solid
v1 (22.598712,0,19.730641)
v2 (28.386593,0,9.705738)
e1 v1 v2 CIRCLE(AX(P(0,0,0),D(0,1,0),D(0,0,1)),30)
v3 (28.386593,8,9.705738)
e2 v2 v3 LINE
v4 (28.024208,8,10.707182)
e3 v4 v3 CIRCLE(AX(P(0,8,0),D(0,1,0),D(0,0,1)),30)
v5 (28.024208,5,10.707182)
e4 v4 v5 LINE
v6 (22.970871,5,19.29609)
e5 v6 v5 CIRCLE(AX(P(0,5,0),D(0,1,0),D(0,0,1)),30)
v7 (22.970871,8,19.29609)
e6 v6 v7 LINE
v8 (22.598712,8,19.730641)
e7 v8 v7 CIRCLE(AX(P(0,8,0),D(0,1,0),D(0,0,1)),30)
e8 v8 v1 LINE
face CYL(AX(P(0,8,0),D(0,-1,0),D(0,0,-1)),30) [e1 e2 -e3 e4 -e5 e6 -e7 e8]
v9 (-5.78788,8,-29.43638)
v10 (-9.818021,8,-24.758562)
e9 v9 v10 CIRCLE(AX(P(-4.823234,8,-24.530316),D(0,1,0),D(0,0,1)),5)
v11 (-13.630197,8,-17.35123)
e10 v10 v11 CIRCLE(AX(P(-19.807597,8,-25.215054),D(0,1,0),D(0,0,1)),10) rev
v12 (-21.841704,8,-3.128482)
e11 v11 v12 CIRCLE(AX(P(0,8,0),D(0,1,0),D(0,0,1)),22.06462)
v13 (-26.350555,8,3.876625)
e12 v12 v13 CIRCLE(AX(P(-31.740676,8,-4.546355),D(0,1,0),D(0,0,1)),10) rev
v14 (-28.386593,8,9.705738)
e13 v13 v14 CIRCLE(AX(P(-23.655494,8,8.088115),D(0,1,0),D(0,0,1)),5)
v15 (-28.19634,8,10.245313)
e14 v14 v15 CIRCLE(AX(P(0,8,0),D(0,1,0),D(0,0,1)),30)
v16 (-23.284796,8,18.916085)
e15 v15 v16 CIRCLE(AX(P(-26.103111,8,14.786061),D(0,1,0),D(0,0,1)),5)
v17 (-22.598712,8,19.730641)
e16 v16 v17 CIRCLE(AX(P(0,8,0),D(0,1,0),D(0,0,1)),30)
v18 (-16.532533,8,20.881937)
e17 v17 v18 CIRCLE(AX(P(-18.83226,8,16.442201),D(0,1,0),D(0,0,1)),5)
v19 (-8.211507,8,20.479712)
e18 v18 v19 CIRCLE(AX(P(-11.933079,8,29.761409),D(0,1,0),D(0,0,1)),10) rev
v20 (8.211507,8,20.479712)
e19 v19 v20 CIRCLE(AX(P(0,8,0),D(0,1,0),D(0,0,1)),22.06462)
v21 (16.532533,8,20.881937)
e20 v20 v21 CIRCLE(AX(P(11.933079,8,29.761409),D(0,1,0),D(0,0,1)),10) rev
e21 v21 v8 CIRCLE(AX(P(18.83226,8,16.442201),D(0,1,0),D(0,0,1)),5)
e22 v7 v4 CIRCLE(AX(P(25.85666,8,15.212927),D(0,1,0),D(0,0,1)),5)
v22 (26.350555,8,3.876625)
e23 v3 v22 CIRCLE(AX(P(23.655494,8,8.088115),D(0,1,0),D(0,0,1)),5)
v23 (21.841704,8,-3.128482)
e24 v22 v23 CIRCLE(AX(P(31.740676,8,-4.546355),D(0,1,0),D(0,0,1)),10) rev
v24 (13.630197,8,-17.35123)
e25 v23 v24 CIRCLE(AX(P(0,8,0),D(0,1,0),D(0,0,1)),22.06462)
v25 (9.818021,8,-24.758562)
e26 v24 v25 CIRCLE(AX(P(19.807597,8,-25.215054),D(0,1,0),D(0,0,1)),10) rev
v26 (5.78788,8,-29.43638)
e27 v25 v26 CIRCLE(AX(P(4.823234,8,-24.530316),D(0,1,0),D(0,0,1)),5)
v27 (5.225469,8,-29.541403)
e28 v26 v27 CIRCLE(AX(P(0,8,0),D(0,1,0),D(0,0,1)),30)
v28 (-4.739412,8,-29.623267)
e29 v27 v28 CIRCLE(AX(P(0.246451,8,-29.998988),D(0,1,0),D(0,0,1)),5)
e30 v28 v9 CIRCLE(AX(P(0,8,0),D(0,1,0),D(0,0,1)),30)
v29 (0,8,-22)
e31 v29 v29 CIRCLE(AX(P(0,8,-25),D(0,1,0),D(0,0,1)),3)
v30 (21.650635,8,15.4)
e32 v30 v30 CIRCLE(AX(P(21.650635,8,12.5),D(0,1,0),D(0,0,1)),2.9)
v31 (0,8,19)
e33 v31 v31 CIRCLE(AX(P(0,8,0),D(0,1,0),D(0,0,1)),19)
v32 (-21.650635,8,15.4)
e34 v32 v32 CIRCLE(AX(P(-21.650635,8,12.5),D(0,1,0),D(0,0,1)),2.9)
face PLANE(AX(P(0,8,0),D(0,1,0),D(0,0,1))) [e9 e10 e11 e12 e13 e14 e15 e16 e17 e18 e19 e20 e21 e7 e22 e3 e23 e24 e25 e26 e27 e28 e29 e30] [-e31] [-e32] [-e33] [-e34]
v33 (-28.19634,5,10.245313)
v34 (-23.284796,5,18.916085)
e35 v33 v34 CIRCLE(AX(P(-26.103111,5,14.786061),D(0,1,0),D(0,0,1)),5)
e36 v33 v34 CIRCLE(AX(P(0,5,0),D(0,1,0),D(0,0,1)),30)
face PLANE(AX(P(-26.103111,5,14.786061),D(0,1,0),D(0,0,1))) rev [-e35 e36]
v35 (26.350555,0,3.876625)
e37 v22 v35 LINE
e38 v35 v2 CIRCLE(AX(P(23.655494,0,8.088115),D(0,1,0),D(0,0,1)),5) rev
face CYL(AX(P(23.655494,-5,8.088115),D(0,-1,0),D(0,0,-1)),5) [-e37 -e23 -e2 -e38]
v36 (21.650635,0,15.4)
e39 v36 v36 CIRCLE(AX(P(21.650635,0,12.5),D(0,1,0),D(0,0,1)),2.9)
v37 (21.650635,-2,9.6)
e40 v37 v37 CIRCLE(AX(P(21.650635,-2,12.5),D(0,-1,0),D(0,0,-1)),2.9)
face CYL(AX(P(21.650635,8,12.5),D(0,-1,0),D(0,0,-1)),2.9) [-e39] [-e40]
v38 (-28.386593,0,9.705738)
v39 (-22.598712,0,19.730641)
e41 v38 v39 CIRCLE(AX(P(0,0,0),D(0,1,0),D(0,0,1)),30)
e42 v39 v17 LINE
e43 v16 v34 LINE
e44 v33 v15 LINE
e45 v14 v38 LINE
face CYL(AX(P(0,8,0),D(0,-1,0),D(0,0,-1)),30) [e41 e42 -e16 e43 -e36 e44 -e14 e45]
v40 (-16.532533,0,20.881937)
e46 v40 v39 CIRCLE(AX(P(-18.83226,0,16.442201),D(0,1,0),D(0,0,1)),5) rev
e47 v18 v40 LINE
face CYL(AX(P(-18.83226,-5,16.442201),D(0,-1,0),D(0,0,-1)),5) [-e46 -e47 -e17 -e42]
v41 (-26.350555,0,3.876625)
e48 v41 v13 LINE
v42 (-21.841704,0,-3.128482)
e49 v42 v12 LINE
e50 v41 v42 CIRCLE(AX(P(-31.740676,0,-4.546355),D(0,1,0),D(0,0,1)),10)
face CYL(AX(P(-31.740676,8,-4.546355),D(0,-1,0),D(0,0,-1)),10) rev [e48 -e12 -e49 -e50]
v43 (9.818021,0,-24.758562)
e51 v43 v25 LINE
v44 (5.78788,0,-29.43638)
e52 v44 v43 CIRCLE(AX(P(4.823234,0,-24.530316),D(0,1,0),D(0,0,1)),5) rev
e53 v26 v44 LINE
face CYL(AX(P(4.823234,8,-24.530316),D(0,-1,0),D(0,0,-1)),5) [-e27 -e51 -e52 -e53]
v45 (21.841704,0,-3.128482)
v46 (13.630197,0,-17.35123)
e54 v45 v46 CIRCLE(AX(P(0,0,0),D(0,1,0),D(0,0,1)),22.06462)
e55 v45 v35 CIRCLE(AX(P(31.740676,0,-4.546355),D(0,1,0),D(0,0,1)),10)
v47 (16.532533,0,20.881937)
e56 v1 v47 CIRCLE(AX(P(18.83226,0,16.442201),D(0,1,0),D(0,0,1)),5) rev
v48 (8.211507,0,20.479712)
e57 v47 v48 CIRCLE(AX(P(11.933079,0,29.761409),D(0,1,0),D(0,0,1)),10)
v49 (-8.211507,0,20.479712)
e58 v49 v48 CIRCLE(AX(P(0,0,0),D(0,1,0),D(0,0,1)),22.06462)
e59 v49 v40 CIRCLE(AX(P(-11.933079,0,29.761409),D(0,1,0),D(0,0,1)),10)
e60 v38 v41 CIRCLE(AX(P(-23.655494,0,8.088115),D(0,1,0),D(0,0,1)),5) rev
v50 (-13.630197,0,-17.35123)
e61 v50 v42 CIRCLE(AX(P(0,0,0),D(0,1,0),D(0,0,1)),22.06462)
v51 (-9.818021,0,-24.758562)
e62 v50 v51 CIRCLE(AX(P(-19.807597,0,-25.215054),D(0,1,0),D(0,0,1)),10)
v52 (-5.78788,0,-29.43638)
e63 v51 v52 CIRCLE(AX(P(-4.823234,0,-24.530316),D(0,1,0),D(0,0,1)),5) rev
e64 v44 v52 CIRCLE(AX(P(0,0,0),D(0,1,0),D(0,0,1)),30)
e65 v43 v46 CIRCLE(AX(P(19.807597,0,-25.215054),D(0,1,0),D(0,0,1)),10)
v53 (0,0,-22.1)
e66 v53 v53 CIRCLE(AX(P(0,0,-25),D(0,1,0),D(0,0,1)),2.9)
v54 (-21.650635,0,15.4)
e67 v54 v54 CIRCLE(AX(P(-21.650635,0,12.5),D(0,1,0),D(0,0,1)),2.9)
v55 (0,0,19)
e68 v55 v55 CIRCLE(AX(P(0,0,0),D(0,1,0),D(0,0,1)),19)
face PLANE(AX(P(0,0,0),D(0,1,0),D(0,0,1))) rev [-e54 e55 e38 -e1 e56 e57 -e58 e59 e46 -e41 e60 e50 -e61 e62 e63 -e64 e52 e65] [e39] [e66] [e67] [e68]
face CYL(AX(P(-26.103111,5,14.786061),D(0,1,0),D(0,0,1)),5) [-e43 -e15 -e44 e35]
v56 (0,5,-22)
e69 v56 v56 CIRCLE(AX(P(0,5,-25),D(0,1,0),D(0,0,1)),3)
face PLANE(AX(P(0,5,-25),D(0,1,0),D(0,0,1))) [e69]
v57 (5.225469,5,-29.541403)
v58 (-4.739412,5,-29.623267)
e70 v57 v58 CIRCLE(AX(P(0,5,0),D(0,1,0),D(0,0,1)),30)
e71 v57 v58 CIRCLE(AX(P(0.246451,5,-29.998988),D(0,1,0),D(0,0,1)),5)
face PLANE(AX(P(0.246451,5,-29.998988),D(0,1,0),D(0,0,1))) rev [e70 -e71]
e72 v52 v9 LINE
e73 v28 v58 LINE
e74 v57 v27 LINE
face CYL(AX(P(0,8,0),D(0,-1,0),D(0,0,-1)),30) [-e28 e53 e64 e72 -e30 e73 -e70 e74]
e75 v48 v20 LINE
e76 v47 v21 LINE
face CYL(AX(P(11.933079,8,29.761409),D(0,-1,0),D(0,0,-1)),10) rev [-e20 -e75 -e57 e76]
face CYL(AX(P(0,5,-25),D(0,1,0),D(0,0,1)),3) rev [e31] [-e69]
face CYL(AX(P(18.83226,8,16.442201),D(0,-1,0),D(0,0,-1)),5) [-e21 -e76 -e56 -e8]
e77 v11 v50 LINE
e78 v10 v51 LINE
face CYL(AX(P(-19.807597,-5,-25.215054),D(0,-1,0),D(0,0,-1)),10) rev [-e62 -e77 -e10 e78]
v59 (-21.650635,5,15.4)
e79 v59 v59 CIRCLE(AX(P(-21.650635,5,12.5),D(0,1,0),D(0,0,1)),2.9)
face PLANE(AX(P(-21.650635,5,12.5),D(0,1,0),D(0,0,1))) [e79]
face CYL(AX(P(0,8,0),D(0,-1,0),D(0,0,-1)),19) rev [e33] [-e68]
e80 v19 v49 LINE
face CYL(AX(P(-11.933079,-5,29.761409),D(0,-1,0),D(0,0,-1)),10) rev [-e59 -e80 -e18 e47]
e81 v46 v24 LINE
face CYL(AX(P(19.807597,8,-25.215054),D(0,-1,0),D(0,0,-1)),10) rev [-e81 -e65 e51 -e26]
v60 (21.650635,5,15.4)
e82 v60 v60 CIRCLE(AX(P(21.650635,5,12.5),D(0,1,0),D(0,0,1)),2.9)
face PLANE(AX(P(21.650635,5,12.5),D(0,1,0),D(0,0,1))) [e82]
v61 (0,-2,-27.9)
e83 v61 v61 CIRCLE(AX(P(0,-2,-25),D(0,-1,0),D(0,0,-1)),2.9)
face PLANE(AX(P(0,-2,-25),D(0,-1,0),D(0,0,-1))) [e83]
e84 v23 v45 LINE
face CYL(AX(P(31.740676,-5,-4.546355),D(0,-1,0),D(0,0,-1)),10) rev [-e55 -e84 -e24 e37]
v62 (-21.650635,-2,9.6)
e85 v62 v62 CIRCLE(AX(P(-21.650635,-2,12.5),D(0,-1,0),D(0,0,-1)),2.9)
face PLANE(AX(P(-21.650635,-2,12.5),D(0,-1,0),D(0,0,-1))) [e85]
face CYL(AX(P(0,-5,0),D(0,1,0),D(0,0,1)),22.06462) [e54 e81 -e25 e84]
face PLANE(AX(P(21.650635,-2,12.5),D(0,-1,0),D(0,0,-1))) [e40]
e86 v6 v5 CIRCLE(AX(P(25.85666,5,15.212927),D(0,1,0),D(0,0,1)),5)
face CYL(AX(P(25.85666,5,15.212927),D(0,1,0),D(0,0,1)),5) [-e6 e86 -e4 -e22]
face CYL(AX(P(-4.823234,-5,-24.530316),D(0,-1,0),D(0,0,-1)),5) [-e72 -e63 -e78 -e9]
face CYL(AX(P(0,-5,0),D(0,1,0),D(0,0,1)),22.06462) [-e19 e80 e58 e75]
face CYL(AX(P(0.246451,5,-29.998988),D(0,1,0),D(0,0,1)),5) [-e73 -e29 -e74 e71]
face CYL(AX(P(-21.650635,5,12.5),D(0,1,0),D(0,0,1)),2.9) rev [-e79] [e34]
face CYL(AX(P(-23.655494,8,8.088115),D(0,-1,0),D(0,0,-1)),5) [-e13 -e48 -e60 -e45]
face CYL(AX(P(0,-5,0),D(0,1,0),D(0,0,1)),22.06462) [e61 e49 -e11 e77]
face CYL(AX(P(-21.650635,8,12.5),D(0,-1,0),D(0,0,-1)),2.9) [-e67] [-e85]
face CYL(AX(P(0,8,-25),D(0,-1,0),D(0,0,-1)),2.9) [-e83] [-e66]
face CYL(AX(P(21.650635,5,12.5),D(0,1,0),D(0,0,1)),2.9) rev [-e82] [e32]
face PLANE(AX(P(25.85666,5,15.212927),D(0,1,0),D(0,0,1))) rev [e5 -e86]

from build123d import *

# Parameters (mm, degrees)
SKETCH1_R                = 19
BOSS_EXTRUDE1_DEPTH      = 3.5
SKETCH2_R                = 30
SKETCH2_R_2              = 19
SKETCH2_R_3              = 2.8
BOSS_EXTRUDE2_DEPTH      = 8
BOSS_EXTRUDE3_DEPTH      = 2
BOSS_EXTRUDE3_DEPTH_BACK = 8
SKETCH4_R                = 2.9
SKETCH5_R                = 5
BOSS_EXTRUDE4_DEPTH      = 3
CUT_EXTRUDE1_START       = -10
SKETCH3_R                = 19
CUT_EXTRUDE1_DEPTH       = 10
SKETCH6_R                = 3
SKETCH6_R_2              = 2.9
CUT_EXTRUDE2_DEPTH       = 3
CUT_EXTRUDE3_START       = -13
CUT_EXTRUDE3_DEPTH       = 13
FILLET1_R                = 10
FILLET2_R                = 5


with BuildPart() as part:
    # Sketch1 → Boss-Extrude1 (new body)
    with BuildSketch(Plane(origin=(0, 0, 0), x_dir=(1, 0, 0), z_dir=(0, 1, 0))):
        with Locations(Location((0, 0, 0), (0, 0, 270))):
            Circle(SKETCH1_R)
    extrude(amount=BOSS_EXTRUDE1_DEPTH)

    # Sketch2 → Boss-Extrude2 (add)
    with BuildSketch(Plane(origin=(0, 0, 0), x_dir=(1, 0, 0), z_dir=(0, 1, 0))):
        with Locations(Location((0, 0, 0), (0, 0, 270))):
            Circle(SKETCH2_R)
        with Locations(Location((0, 0, 0), (0, 0, 270))):
            Circle(SKETCH2_R_2, mode=Mode.SUBTRACT)
        with Locations(Location((0, 25, 0), (0, 0, 270))):
            Circle(SKETCH2_R_3, mode=Mode.SUBTRACT)
        with Locations(Location((21.650635095, -12.5, 0), (0, 0, 270))):
            Circle(SKETCH2_R_3, mode=Mode.SUBTRACT)
        with Locations(Location((-21.650635095, -12.5, 0), (0, 0, 270))):
            Circle(SKETCH2_R_3, mode=Mode.SUBTRACT)
    extrude(amount=BOSS_EXTRUDE2_DEPTH)

    # Sketch4 → Boss-Extrude3 (add, two sides: drawn at the far end of the back side and taken through both)
    with BuildSketch(Plane.XZ.offset(-BOSS_EXTRUDE3_DEPTH_BACK)):
        with Locations(Location((-21.650635095, 12.5, 0), (0, 0, 270))):
            Circle(SKETCH4_R)
        with Locations(Location((21.650635095, 12.5, 0), (0, 0, 270))):
            Circle(SKETCH4_R)
        with Locations(Location((0, -25, 0), (0, 0, 270))):
            Circle(SKETCH4_R)
    extrude(amount=BOSS_EXTRUDE3_DEPTH + BOSS_EXTRUDE3_DEPTH_BACK)

    # Sketch5 → Boss-Extrude4 (add)
    with BuildSketch(Plane(origin=(0, 8, 0), x_dir=(1, 0, 0), z_dir=(0, 1, 0))):
        with Locations((-26.103110985, -14.7860609)):
            Circle(SKETCH5_R)
        with Locations((0.246451131, 29.99898768)):
            Circle(SKETCH5_R)
        with Locations((25.856659853, -15.212926781)):
            Circle(SKETCH5_R)
    extrude(amount=-BOSS_EXTRUDE4_DEPTH)

    # Sketch3 → Cut-Extrude1 (cut)
    with BuildSketch(Plane(origin=(0, 3.5, 0), x_dir=(1, 0, 0), z_dir=(0, 1, 0)).offset(CUT_EXTRUDE1_START)):
        with Locations(Location((0, 0, 0), (0, 0, 270))):
            Circle(SKETCH3_R)
    extrude(amount=CUT_EXTRUDE1_DEPTH, mode=Mode.SUBTRACT)

    # Sketch6 → Cut-Extrude2 (cut)
    with BuildSketch(Plane(origin=(0, 8, 0), x_dir=(1, 0, 0), z_dir=(0, 1, 0))):
        with Locations(Location((0, 25, 0), (0, 0, 270))):
            Circle(SKETCH6_R)
        with Locations(Location((21.650635095, -12.5, 0), (0, 0, 90))):
            Circle(SKETCH6_R_2)
        with Locations(Location((-21.650635095, -12.5, 0), (0, 0, 90))):
            Circle(SKETCH6_R_2)
    extrude(amount=-CUT_EXTRUDE2_DEPTH, mode=Mode.SUBTRACT)

    # Sketch7 → Cut-Extrude3 (cut)
    with BuildSketch(Plane(origin=(0, 8, 0), x_dir=(1, 0, 0), z_dir=(0, 1, 0)).offset(CUT_EXTRUDE3_START)):
        with BuildLine():
            ThreePointArc((-29.54423259, -5.20944533), (-25.980762114, 15), (-10.2606043, 28.190778624))
            Line((-10.2606043, 28.190778624), (-13.773984089, 37.84371026))
            Line((-13.773984089, 37.84371026), (-43.939319858, -7.747687605))
            Line((-43.939319858, -7.747687605), (-29.54423259, -5.20944533))
        make_face()
        with BuildLine():
            ThreePointArc((-21.729408673, -3.831481024), (-19.108521295, 11.032309914), (-7.546544436, 20.733960432))
            Line((-7.546544436, 20.733960432), (-10.2606043, 28.190778624))
            ThreePointArc((-10.2606043, 28.190778624), (-25.980762114, 15), (-29.54423259, -5.20944533))
            Line((-29.54423259, -5.20944533), (-21.729408673, -3.831481024))
        make_face()
        with BuildLine():
            Line((15.259965643, 41.926411025), (10.2606043, 28.190778624))
            ThreePointArc((10.2606043, 28.190778624), (25.980762114, 15), (29.54423259, -5.20944533))
            Line((29.54423259, -5.20944533), (39.660606503, -6.993234998))
            Line((39.660606503, -6.993234998), (15.259965643, 41.926411025))
        make_face()
        with BuildLine():
            Line((10.2606043, 28.190778624), (7.546544436, 20.733960432))
            ThreePointArc((7.546544436, 20.733960432), (18.074278438, 12.65574601), (22.064619828, 0))
            ThreePointArc((22.064619828, 0), (21.980657288, -1.92305833), (21.729408673, -3.831481024))
            Line((21.729408673, -3.831481024), (29.54423259, -5.20944533))
            ThreePointArc((29.54423259, -5.20944533), (25.980762114, 15), (10.2606043, 28.190778624))
        make_face()
        with BuildLine():
            Line((28.679354216, -34.17872342), (19.283628291, -22.981333294))
            ThreePointArc((19.283628291, -22.981333294), (0, -30), (-19.283628291, -22.981333294))
            Line((-19.283628291, -22.981333294), (-25.886622414, -30.850475262))
            Line((-25.886622414, -30.850475262), (28.679354216, -34.17872342))
        make_face()
        with BuildLine():
            Line((19.283628291, -22.981333294), (14.182864238, -16.902479408))
            ThreePointArc((14.182864238, -16.902479408), (0, -22.064619828), (-14.182864238, -16.902479408))
            Line((-14.182864238, -16.902479408), (-19.283628291, -22.981333294))
            ThreePointArc((-19.283628291, -22.981333294), (0, -30), (19.283628291, -22.981333294))
        make_face()
    extrude(amount=CUT_EXTRUDE3_DEPTH, mode=Mode.SUBTRACT)

    # Fillet1
    # the kernel refuses this fillet: 10 mm, written as the material it adds along each edge
    with BuildSketch(Plane(origin=(-21.729408673, 0, 3.831481024), x_dir=(-0.9848077530122133, 0, 0.17364817766690055), z_dir=(0, 1, 0)), Plane(origin=(14.182864238, 0, 16.902479408), x_dir=(0.6427876096865253, 0, 0.7660444431189899), z_dir=(0, 1, 0)), Plane(origin=(7.546544436, 0, -20.733960432), x_dir=(0.34202014332569675, 0, -0.9396926207858982), z_dir=(0, 1, 0))) as fillet1_piece_1:
        with BuildLine():
            CenterArc((8.404377584, -9.988996017), FILLET1_R, 92.688143309, 69.160575724)
            Line((-1.097995304, -6.873725644), (-1.288042762, -6.811420237))
            ThreePointArc((-1.288042762, -6.811420237), (-0.473724072, -3.448886874), (-0.2, 0))
            Line((-0.2, 0), (0, 0.2))
            ThreePointArc((0, 0.2), (3.967690086, 0.2), (7.926000224, 0.19977992))
            Line((7.926000224, 0.19977992), (7.935380172, 0))
        make_face()
    extrude(amount=8)
    with BuildSketch(Plane(origin=(-14.182864238, 0, 16.902479408), x_dir=(0.8578464941811706, 0, 0.5139060151633514), z_dir=(0, 1, 0)), Plane(origin=(21.729408673, 0, 3.831481024), x_dir=(0.016132417198510746, 0, -0.999869864089989), z_dir=(0, 1, 0)), Plane(origin=(-7.546544436, 0, -20.733960432), x_dir=(-0.8739789113796794, 0, 0.48596384892663586), z_dir=(0, 1, 0))) as fillet1_piece_2:
        with BuildLine():
            CenterArc((8.538251552, -9.87480959), FILLET1_R, 99.075640483, 69.160575724)
            Line((-1.251712984, -7.836036823), (-1.447512274, -7.795261367))
            ThreePointArc((-1.447512274, -7.795261367), (-0.823352684, -3.886470761), (-0.197496192, 0.03154765))
            Line((-0.197496192, 0.03154765), (0.03154765, 0.197496192))
            ThreePointArc((0.03154765, 0.197496192), (3.480434524, -0.07622788), (6.929321399, 0.197496192))
            Line((6.929321399, 0.197496192), (6.960869049, 0))
        make_face()
    extrude(amount=8)

    # Fillet2
    fillet2_edges = [part.edges().sort_by_distance(p)[0] for p in [
        (-19.283628291, 4, 22.981333294),
        (19.283628291, 4, 22.981333294),
        (29.54423259, 4, 5.20944533),
        (10.2606043, 4, -28.190778624),
        (-10.2606043, 4, -28.190778624),
        (-29.54423259, 4, 5.20944533),
    ]]
    fillet(fillet2_edges, radius=FILLET2_R)


solid = part.part
